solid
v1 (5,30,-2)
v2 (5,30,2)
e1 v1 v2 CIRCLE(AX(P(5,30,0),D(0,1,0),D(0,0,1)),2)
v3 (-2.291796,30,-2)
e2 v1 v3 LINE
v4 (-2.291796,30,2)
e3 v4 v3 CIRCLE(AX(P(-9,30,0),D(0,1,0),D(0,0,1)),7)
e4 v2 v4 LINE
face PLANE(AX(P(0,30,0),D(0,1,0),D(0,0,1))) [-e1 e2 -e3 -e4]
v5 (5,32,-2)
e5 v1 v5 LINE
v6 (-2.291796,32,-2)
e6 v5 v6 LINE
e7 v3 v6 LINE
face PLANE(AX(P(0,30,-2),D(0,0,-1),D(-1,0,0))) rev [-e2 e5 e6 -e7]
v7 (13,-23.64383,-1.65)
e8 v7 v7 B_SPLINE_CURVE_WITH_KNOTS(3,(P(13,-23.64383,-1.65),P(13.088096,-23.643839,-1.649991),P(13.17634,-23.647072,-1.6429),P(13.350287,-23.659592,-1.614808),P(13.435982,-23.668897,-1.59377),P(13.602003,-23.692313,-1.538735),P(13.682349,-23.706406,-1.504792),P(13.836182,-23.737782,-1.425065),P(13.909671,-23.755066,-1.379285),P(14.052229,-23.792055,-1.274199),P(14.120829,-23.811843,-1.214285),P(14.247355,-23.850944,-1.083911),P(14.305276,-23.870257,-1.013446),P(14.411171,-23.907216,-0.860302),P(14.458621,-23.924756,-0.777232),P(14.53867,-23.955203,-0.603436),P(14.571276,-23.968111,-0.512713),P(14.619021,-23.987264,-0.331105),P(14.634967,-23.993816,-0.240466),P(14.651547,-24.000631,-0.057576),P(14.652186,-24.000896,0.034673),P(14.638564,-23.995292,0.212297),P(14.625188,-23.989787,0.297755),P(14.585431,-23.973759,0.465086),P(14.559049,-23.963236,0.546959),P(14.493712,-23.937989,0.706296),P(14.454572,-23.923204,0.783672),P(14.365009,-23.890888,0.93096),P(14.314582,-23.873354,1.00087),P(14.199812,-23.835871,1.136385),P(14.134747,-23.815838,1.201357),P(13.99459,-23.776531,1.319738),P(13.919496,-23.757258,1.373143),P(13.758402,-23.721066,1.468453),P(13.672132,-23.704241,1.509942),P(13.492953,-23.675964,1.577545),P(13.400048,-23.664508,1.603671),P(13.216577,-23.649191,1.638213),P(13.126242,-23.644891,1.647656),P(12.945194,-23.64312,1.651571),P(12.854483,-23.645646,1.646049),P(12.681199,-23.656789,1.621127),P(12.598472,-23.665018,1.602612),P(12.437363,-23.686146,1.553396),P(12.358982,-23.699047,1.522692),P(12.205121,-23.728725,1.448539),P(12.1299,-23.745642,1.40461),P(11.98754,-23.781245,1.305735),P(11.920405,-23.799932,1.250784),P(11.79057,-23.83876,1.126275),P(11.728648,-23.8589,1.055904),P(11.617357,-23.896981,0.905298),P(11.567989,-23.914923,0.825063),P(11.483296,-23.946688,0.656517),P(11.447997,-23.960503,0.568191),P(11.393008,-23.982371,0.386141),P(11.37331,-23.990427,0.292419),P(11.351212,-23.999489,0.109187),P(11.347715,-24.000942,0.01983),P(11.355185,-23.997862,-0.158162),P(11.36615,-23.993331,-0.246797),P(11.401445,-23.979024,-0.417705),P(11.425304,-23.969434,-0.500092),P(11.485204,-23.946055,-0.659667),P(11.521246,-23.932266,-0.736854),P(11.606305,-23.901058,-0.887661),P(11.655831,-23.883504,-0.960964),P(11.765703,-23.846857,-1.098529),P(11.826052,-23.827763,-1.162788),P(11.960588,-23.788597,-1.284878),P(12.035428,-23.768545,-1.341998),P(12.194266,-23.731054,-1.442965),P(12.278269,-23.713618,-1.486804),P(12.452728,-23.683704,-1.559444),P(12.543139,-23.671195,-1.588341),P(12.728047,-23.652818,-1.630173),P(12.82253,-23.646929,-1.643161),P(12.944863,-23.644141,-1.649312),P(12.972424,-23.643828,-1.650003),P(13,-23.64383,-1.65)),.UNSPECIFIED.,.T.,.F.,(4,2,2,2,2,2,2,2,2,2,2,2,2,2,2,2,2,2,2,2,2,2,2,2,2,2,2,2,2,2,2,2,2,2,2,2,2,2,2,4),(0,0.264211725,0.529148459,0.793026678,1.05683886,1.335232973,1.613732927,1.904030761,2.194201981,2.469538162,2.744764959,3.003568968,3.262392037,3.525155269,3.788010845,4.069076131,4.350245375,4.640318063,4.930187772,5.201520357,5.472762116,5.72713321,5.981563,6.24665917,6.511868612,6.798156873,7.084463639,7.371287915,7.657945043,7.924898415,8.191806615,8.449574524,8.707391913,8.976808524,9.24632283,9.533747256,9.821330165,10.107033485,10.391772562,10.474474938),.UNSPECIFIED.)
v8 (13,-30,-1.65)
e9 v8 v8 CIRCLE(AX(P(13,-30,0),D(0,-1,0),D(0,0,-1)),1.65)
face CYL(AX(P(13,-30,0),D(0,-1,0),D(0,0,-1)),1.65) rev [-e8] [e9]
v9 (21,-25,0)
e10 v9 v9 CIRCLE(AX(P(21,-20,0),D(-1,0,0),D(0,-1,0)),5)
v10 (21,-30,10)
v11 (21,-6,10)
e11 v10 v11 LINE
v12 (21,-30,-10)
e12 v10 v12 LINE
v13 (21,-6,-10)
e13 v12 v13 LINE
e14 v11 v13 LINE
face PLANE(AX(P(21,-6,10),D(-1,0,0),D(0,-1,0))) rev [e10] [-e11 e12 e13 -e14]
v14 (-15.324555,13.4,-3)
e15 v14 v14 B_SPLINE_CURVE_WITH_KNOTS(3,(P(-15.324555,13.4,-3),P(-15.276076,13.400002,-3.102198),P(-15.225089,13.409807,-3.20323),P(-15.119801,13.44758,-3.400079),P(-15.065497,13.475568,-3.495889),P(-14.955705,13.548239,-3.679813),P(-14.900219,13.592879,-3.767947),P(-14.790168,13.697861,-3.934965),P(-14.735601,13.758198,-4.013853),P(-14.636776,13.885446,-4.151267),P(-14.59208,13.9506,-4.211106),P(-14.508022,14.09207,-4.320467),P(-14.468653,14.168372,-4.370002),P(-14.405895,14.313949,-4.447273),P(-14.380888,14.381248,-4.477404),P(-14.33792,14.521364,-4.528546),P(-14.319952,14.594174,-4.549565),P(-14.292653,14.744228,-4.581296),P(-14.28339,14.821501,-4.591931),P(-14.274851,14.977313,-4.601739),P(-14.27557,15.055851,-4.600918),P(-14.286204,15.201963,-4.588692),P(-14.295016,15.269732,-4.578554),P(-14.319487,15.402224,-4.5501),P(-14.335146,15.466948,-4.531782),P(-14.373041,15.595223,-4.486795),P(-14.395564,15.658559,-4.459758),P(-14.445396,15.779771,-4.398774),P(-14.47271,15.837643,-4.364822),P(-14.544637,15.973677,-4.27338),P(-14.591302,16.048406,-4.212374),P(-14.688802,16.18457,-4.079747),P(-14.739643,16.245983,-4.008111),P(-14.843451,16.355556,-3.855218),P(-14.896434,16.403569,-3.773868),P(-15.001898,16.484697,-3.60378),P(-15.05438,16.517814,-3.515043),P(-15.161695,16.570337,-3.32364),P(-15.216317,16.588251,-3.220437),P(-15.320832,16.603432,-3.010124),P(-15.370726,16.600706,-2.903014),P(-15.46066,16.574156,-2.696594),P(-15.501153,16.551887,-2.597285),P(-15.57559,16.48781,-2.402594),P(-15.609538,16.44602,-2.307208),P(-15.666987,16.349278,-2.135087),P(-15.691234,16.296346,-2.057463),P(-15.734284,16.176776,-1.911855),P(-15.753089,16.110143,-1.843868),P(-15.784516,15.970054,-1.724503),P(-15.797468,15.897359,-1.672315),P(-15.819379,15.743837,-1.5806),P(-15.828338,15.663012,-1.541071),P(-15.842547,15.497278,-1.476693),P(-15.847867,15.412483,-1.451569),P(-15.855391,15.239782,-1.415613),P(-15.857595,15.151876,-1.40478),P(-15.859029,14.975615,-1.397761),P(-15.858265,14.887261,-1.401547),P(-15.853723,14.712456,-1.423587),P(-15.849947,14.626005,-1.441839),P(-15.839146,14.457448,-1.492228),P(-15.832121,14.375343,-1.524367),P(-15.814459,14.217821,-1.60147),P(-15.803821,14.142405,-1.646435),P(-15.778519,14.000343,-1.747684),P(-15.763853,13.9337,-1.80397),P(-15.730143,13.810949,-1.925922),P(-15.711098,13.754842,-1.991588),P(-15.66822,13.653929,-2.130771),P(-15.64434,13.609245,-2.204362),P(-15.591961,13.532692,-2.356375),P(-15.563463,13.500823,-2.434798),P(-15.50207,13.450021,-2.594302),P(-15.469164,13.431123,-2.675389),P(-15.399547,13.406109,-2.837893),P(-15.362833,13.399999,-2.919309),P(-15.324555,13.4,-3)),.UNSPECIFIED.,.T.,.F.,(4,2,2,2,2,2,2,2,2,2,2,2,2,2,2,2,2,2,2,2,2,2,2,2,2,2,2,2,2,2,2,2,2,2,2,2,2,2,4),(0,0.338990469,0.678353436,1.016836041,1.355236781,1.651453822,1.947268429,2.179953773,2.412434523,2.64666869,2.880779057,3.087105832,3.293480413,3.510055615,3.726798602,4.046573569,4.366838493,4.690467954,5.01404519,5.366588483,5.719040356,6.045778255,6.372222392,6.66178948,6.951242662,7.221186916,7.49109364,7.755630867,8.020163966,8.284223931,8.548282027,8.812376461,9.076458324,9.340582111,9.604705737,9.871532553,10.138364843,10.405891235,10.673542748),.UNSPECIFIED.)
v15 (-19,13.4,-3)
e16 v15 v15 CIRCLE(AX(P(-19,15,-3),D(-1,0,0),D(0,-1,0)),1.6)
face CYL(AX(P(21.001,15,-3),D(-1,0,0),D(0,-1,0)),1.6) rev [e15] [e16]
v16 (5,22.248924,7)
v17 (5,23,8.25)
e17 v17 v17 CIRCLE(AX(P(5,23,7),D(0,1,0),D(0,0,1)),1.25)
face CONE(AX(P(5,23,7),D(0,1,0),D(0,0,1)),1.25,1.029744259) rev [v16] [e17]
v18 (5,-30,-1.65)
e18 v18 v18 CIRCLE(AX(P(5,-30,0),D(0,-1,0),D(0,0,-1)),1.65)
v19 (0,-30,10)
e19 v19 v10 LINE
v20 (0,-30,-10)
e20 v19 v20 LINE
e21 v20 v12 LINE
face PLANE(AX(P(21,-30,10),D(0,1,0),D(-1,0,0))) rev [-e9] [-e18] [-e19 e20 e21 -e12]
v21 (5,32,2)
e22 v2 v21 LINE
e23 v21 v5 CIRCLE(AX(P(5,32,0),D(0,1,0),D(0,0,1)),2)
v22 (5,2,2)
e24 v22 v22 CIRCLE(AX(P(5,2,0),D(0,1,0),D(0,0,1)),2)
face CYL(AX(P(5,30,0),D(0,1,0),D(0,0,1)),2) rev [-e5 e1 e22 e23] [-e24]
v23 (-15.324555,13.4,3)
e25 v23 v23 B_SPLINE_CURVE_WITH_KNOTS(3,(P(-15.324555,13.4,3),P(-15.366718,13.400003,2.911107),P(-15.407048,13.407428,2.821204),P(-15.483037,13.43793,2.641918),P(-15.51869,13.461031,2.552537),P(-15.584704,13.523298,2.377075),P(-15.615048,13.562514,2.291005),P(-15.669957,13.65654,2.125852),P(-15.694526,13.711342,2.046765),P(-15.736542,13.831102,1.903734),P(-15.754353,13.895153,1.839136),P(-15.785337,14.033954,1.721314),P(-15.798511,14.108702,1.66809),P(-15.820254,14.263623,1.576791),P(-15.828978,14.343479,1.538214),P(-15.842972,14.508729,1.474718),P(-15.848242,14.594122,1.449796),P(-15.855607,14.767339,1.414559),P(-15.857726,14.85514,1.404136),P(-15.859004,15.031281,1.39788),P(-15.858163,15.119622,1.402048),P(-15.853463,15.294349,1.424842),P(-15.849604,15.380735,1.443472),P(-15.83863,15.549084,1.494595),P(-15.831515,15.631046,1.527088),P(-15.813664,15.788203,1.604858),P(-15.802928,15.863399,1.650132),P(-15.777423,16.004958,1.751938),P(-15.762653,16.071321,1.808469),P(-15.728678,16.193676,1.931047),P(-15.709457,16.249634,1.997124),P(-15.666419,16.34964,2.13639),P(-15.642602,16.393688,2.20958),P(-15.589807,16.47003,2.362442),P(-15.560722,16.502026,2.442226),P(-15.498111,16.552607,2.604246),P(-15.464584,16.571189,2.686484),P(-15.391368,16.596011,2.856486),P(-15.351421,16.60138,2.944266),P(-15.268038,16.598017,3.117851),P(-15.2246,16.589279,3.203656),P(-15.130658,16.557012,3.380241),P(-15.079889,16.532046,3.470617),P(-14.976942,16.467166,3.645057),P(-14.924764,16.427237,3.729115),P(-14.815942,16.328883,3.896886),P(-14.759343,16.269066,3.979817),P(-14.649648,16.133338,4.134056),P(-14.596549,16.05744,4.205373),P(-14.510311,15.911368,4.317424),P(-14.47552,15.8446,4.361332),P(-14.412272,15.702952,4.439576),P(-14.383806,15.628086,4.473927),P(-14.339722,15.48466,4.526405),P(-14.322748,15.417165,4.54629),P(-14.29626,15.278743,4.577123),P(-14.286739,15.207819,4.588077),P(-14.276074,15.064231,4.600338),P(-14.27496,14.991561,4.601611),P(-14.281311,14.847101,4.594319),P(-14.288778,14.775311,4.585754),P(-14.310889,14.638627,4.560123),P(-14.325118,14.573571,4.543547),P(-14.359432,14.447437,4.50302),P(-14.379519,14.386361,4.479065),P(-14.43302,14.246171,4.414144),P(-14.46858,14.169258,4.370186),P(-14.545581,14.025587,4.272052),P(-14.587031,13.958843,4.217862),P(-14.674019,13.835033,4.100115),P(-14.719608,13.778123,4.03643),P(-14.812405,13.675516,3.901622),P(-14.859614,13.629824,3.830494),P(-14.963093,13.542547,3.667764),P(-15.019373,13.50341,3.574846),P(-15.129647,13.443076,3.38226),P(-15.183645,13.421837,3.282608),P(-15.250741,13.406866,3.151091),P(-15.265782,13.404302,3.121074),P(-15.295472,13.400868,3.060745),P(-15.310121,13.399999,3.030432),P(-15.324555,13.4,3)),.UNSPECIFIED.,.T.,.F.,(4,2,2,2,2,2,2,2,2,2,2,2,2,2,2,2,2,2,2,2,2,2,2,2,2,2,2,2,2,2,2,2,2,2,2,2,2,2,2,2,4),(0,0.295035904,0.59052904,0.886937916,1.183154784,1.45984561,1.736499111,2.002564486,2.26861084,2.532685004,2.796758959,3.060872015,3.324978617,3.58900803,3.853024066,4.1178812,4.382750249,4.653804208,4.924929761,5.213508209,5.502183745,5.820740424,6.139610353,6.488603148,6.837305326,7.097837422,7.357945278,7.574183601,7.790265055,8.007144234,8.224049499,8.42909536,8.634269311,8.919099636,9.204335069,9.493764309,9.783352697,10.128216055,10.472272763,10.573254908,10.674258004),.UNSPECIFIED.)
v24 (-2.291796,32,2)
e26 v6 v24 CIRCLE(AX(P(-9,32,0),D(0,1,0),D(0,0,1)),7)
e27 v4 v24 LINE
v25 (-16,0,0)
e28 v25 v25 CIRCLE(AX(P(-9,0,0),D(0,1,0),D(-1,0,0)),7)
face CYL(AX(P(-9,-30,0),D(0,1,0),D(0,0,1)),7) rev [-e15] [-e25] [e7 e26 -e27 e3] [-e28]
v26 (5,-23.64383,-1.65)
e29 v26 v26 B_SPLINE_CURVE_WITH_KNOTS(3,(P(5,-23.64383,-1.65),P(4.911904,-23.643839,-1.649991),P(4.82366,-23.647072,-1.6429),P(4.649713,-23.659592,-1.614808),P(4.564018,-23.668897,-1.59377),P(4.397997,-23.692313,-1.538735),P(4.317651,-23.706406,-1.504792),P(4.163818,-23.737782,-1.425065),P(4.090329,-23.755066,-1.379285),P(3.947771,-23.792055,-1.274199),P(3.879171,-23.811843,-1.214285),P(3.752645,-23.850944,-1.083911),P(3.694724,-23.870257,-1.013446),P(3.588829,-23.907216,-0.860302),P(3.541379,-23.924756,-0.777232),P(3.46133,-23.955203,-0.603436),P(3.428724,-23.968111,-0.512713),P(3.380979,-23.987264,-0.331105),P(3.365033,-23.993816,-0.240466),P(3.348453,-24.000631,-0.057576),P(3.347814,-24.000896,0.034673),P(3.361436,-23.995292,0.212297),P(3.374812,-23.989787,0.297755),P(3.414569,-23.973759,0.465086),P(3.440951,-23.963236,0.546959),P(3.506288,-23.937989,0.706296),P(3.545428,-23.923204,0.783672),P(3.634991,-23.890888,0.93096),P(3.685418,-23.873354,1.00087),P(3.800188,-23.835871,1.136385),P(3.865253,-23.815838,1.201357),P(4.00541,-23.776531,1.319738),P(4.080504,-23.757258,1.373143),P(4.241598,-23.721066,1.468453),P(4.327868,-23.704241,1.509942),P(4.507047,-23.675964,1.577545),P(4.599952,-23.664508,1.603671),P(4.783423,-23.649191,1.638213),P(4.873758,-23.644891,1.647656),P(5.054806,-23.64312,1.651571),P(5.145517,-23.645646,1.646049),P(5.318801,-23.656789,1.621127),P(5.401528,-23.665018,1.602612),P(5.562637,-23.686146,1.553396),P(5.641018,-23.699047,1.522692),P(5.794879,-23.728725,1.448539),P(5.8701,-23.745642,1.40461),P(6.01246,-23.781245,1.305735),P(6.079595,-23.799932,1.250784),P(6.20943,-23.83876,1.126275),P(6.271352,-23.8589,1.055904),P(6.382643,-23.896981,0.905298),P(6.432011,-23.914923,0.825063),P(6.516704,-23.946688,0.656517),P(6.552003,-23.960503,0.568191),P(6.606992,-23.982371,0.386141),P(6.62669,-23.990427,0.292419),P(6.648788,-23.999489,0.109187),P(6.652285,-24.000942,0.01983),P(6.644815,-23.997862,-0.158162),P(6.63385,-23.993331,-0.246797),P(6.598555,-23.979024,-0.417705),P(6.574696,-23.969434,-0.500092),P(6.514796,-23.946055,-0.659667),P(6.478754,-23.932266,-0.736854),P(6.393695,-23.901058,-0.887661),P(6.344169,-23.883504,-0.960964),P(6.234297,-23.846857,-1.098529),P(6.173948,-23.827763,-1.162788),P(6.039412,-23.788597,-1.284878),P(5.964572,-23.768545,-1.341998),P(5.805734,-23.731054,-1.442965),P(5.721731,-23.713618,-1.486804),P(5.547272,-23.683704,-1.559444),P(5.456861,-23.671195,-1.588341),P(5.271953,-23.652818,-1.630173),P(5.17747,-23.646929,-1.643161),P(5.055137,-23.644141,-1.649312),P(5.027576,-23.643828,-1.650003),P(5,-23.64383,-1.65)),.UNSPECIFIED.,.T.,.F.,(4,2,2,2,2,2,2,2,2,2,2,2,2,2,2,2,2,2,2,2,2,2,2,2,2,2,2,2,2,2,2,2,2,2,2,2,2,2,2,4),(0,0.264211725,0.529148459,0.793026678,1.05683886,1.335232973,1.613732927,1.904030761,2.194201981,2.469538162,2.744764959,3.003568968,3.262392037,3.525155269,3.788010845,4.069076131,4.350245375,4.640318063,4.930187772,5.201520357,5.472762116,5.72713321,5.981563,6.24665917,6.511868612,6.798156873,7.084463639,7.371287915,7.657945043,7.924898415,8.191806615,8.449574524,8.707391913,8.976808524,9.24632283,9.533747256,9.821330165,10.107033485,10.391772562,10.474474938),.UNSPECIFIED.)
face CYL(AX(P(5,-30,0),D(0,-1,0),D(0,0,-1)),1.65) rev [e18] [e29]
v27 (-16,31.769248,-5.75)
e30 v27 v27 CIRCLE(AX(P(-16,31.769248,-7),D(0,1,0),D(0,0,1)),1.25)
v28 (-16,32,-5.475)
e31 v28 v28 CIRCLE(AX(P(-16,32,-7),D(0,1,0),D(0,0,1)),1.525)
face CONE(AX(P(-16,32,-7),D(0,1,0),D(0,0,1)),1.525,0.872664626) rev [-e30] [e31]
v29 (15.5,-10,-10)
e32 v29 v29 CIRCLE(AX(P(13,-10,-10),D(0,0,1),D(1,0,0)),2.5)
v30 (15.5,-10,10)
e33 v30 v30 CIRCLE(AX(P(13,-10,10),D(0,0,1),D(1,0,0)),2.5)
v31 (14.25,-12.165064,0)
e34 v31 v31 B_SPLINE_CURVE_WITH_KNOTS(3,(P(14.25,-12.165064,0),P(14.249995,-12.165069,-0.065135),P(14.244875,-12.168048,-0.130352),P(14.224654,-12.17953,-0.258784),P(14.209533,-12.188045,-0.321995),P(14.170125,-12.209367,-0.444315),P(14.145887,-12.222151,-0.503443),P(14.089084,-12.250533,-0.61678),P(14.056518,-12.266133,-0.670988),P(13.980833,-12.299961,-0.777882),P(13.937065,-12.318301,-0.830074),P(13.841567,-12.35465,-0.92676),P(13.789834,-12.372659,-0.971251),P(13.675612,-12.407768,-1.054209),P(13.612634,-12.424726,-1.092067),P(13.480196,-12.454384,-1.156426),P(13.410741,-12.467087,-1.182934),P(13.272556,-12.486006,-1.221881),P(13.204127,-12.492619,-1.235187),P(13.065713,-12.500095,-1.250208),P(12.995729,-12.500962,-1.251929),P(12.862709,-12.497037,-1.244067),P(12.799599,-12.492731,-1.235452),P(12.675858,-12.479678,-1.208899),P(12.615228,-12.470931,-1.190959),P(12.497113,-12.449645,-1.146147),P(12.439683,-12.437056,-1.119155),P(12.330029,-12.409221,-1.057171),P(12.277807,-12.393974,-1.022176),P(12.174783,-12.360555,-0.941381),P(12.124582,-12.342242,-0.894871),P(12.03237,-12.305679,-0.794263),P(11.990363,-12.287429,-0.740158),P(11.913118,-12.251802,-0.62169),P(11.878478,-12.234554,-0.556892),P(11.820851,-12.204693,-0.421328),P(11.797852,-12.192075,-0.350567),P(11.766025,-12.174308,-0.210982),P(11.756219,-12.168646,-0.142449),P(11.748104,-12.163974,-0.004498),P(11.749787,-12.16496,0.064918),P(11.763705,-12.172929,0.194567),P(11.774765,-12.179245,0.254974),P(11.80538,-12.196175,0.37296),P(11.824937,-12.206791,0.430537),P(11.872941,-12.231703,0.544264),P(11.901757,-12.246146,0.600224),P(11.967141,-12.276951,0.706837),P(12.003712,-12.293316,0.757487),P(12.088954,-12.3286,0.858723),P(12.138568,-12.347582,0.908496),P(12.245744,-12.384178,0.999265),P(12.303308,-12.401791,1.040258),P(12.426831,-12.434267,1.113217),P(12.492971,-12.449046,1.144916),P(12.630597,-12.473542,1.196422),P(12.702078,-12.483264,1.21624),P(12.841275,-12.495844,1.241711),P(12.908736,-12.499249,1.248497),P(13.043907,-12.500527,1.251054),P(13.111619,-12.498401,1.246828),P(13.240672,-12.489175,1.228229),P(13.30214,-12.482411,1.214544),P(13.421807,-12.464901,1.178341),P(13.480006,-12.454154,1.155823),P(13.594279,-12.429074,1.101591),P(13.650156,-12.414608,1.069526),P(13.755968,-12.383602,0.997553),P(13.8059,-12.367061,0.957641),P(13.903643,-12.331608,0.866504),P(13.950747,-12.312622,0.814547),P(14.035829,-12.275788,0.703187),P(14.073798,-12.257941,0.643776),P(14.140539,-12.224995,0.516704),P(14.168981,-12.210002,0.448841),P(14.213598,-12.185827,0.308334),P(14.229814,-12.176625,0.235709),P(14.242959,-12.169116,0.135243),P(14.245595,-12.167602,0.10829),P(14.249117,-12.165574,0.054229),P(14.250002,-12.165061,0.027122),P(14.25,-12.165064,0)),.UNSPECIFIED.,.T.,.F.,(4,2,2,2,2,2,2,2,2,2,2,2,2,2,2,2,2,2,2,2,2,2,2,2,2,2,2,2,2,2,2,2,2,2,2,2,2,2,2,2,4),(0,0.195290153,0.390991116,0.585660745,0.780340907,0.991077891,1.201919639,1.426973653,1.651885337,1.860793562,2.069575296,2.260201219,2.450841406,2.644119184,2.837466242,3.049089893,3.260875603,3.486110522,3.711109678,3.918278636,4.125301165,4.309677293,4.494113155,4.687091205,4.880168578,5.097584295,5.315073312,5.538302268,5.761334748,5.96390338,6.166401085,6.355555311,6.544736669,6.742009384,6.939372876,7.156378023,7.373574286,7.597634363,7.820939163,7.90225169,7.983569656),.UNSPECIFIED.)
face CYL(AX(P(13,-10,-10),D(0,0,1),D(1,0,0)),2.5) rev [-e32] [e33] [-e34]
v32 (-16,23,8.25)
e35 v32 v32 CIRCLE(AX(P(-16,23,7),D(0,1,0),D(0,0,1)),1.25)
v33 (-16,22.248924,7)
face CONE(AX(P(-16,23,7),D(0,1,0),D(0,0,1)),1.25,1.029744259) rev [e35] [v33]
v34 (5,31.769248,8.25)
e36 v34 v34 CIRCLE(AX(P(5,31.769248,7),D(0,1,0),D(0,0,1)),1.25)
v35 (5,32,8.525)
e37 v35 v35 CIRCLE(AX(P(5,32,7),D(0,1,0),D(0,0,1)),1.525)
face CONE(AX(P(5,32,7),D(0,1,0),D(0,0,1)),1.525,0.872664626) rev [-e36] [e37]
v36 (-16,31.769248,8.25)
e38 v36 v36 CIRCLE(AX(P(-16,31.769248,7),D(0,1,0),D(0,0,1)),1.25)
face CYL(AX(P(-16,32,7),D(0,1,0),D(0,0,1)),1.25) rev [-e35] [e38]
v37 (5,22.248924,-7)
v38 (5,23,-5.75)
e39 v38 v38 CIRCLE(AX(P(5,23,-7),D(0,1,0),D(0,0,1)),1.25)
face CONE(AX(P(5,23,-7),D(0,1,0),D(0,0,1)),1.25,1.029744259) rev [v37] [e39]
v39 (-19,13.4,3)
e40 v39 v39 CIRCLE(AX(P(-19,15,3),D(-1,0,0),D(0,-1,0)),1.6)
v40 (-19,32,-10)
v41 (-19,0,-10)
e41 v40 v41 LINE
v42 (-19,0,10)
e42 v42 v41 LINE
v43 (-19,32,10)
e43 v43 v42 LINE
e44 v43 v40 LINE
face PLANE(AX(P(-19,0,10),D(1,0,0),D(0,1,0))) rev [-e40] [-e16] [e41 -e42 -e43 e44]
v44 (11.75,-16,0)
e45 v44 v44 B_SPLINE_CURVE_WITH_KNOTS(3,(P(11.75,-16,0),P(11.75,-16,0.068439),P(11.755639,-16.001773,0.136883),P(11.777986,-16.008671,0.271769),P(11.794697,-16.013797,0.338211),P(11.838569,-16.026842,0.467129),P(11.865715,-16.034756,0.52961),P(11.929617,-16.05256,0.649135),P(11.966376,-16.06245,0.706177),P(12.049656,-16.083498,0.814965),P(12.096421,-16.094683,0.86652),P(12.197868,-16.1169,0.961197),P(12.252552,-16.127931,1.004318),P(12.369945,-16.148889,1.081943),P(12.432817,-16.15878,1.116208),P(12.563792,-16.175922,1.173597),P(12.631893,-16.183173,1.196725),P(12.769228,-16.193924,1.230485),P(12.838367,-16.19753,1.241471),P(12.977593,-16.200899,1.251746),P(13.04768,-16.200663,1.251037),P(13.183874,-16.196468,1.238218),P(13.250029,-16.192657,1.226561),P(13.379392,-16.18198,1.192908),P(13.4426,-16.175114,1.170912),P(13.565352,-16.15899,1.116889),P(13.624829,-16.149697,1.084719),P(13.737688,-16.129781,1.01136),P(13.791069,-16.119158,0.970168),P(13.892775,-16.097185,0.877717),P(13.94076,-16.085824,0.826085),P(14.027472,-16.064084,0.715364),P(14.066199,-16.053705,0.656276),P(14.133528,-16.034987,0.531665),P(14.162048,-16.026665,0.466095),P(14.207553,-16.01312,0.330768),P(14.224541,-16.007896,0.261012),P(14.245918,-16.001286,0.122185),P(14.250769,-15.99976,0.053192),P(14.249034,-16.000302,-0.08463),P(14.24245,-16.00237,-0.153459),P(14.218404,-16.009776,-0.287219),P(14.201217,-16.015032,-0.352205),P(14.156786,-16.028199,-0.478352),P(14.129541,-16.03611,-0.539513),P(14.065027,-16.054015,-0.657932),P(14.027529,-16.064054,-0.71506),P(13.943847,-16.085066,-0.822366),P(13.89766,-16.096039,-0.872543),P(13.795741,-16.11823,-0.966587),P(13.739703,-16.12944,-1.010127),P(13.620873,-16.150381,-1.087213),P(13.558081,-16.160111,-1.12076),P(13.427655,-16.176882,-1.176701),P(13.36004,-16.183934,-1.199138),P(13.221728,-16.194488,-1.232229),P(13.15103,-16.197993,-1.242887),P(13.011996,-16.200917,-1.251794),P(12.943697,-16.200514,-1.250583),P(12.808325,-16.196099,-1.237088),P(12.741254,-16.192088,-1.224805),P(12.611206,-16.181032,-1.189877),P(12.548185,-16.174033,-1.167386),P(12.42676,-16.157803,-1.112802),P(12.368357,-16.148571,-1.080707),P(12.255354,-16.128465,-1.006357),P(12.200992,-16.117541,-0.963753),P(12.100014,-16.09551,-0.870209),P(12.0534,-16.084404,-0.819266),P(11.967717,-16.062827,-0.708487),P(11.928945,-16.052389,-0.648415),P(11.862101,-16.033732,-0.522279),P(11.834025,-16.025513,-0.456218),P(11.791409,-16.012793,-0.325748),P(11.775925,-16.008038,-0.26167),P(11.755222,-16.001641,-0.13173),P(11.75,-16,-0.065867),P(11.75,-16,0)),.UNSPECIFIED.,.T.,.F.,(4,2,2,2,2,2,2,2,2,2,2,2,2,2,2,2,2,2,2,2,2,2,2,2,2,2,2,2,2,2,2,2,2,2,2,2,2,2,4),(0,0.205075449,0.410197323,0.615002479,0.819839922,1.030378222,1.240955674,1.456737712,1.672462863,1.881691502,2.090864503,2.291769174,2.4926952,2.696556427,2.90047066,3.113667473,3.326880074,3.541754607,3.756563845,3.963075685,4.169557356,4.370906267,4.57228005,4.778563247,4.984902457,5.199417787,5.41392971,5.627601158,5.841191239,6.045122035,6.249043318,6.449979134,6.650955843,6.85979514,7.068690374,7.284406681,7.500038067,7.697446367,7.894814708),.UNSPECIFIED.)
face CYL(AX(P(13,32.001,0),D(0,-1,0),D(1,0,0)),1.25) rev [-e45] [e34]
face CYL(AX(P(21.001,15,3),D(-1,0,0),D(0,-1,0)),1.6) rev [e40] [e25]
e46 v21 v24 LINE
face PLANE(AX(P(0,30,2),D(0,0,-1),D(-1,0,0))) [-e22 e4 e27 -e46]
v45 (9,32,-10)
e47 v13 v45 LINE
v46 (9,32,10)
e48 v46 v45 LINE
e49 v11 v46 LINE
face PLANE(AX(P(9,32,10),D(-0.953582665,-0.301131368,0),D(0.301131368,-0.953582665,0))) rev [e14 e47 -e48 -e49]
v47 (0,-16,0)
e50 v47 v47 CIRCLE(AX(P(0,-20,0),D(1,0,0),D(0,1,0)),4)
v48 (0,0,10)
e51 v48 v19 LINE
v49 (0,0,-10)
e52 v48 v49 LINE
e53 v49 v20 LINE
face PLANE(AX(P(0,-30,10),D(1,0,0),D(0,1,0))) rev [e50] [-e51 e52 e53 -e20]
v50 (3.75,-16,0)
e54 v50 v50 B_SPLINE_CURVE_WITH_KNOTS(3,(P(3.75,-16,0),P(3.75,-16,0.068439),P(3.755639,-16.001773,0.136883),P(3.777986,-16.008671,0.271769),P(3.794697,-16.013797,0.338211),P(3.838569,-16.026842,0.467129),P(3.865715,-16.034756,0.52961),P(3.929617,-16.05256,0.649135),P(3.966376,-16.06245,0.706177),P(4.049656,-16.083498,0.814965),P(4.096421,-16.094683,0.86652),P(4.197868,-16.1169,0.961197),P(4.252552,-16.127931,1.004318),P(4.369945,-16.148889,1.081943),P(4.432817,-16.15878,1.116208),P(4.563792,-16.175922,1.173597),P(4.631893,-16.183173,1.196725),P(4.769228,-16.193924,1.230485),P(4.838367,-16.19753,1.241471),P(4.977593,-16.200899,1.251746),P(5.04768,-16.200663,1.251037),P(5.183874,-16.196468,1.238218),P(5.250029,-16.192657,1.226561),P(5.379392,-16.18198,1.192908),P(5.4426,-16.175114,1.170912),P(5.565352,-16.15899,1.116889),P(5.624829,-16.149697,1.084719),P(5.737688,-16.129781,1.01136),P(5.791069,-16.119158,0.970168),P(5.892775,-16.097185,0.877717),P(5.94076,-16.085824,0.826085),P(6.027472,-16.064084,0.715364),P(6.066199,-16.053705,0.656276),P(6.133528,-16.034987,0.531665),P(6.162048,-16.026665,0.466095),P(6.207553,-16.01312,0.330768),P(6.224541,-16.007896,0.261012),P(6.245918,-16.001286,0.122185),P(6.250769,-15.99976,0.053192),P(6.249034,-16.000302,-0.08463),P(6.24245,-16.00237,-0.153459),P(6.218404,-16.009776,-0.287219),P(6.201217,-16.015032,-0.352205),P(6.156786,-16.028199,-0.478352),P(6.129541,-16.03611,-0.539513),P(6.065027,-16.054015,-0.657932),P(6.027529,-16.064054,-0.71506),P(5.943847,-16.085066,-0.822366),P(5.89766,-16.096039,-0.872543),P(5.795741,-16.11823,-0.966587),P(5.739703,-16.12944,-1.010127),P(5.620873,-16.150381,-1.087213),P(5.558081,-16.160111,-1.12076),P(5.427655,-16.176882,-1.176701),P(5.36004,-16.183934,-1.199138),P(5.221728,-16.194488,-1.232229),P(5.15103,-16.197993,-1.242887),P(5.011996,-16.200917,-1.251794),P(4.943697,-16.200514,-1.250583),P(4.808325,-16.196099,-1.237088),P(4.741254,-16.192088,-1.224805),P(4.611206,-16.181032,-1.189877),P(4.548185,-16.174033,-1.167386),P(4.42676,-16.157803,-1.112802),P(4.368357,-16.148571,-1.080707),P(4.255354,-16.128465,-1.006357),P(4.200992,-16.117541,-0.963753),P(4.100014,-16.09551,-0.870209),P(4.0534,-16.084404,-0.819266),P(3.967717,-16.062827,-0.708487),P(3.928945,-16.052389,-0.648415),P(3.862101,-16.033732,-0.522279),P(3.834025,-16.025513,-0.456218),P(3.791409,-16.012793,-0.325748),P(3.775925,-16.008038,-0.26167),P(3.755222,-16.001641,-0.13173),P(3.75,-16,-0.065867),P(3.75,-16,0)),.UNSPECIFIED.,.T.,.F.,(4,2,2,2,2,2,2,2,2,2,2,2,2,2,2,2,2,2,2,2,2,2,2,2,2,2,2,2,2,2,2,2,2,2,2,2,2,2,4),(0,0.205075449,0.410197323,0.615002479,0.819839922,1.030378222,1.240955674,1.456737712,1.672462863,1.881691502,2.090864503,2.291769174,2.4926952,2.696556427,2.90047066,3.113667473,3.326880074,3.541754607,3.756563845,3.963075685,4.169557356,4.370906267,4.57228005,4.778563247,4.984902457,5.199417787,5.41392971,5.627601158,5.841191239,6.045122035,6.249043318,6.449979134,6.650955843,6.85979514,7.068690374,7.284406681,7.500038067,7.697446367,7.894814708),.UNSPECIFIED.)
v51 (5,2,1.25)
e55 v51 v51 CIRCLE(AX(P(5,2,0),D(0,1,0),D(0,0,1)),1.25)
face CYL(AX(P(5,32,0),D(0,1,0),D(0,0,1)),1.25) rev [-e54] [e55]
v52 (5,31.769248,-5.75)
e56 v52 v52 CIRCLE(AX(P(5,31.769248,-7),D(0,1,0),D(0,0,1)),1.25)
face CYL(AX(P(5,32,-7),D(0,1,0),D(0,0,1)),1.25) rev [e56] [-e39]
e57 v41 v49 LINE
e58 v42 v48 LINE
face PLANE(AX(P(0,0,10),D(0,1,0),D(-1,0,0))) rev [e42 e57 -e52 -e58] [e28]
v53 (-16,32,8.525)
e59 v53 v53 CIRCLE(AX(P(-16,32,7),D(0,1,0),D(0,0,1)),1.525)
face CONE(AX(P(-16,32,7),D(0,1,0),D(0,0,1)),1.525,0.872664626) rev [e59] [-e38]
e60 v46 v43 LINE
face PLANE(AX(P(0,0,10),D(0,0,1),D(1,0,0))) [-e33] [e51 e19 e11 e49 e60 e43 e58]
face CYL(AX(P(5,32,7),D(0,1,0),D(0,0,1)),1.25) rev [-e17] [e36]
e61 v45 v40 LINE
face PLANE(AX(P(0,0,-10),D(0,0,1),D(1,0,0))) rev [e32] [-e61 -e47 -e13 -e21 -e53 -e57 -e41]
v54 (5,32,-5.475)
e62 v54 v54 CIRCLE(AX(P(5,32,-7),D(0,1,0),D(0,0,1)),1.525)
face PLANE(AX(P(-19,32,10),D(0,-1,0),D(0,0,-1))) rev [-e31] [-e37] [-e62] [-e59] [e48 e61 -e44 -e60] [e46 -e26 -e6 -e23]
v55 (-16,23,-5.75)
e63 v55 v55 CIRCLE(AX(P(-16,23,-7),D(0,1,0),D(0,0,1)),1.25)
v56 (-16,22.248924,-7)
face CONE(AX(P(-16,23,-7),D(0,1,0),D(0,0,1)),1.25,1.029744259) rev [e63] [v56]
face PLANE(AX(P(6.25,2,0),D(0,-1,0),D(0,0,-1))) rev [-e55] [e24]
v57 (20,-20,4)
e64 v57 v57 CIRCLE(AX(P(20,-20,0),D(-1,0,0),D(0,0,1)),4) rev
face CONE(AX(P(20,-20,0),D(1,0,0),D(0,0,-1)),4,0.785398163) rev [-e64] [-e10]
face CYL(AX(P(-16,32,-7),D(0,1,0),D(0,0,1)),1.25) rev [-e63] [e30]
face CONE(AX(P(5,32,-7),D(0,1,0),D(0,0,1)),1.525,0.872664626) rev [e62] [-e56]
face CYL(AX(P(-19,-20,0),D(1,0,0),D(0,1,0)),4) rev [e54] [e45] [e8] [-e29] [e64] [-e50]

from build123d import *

# Parameters (mm, degrees)
BOSS_EXTRUDE1_DEPTH         = 10
CUT_EXTRUDE1_DEPTH          = 67.219332525
CUT_EXTRUDE2_DEPTH          = 2
M3_TAPPED_HOLE2_D           = 2.5
M3_TAPPED_HOLE2_DEPTH       = 9
M3_TAPPED_HOLE2_CSINK_D     = 3.05
M3_TAPPED_HOLE2_CSINK_ANGLE = 100
M3_TAPPED_HOLE2_TIP         = 0.751075774
SKETCH7_R                   = 2.5
CUT_EXTRUDE3_DEPTH          = 44.185645763
SKETCH8_R                   = 4
CUT_EXTRUDE4_DEPTH          = 53.191953403
CHAMFER1_SIZE               = 1
CUT_EXTRUDE5_REACH          = 54.192
CUT_EXTRUDE5_END_RADIUS     = 7
SKETCH11_R                  = 1.6
M4_TAPPED_HOLE1_REACH       = 68.219
M4_TAPPED_HOLE1_BORE_R      = 1.65
CUT_EXTRUDE6_REACH          = 68.219
CUT_EXTRUDE6_END_RADIUS     = 2.5
SKETCH14_R                  = 1.25


# Read off the part's stored shape, not the designer's step: Hole1
with BuildPart() as part:
    # Sketch1 → Boss-Extrude1 (new, symmetric)
    with BuildSketch(Plane.XY):
        Polygon((0, 0), (-19, 0), (-19, 32), (9, 32), (21, -6), (21, -30), (0, -30), align=None)
    extrude(amount=BOSS_EXTRUDE1_DEPTH, both=True)

    # Sketch2 → Cut-Extrude1 (cut, through all)
    with BuildSketch(Plane(origin=(0, 32, 0), x_dir=(1, 0, 0), z_dir=(0, 1, 0))):
        with BuildLine():
            ThreePointArc((-2.291796068, 2), (-10.010587075, 6.926666858), (-16, 0))
            Line((-16, 0), (-2, 0))
            ThreePointArc((-2, 0), (-2.073333142, 1.010587075), (-2.291796068, 2))
        make_face()
        with BuildLine():
            Line((-2, 0), (-16, 0))
            ThreePointArc((-16, 0), (-10.010587075, -6.926666858), (-2.291796068, -2))
            ThreePointArc((-2.291796068, -2), (-2.073333142, -1.010587075), (-2, 0))
        make_face()
    extrude(amount=-CUT_EXTRUDE1_DEPTH, mode=Mode.SUBTRACT)

    # Sketch2<3> → Cut-Extrude2 (cut)
    with BuildSketch(Plane(origin=(0, 32, 0), x_dir=(1, 0, 0), z_dir=(0, 1, 0))):
        with BuildLine():
            ThreePointArc((5, 2), (3.585786438, 1.414213562), (3, 0))
            Line((3, 0), (7, 0))
            ThreePointArc((7, 0), (6.414213562, 1.414213562), (5, 2))
        make_face()
        with BuildLine():
            Line((7, 0), (3, 0))
            ThreePointArc((3, 0), (3.585786438, -1.414213562), (5, -2))
            ThreePointArc((5, -2), (6.414213562, -1.414213562), (7, 0))
        make_face()
        with BuildLine():
            ThreePointArc((-2.291796068, 2), (-2.073333142, 1.010587075), (-2, 0))
            Line((-2, 0), (3, 0))
            ThreePointArc((3, 0), (3.585786438, 1.414213562), (5, 2))
            Line((5, 2), (-2.291796068, 2))
        make_face()
        with BuildLine():
            Line((3, 0), (-2, 0))
            ThreePointArc((-2, 0), (-2.073333142, -1.010587075), (-2.291796068, -2))
            Line((-2.291796068, -2), (5, -2))
            ThreePointArc((5, -2), (3.585786438, -1.414213562), (3, 0))
        make_face()
    extrude(amount=-CUT_EXTRUDE2_DEPTH, mode=Mode.SUBTRACT)

    # M3 Tapped Hole2
    with Locations(Plane(origin=(0, 32, 0), x_dir=(1, 0, 0), z_dir=(0, 1, 0))):
        with Locations((-16, 7), (-16, -7), (5, 7), (5, -7)):
            CounterSinkHole(M3_TAPPED_HOLE2_D / 2, M3_TAPPED_HOLE2_CSINK_D / 2, depth=M3_TAPPED_HOLE2_DEPTH, counter_sink_angle=M3_TAPPED_HOLE2_CSINK_ANGLE)
            with Locations((0, 0, -(M3_TAPPED_HOLE2_DEPTH + M3_TAPPED_HOLE2_TIP / 2))):  # 118° drill point
                Cone(0, M3_TAPPED_HOLE2_D / 2, M3_TAPPED_HOLE2_TIP, mode=Mode.SUBTRACT)

    # Sketch7 → Cut-Extrude3 (cut, through all)
    with BuildSketch(Plane.XY.offset(10)):
        with Locations((13, -10)):
            Circle(SKETCH7_R)
    extrude(amount=-CUT_EXTRUDE3_DEPTH, mode=Mode.SUBTRACT)

    # Sketch8 → Cut-Extrude4 (cut, through all)
    with BuildSketch(Plane(origin=(21, 0, 0), x_dir=(0, 0, -1), z_dir=(1, 0, 0))):
        with Locations(Location((0, -20, 0), (0, 0, 90))):
            Circle(SKETCH8_R)
    extrude(amount=-CUT_EXTRUDE4_DEPTH, mode=Mode.SUBTRACT)

    # Chamfer1
    chamfer1_edges = [part.edges().sort_by_distance(p)[0] for p in [
        (21, -24, 0),
    ]]
    chamfer(chamfer1_edges, length=CHAMFER1_SIZE)

    # Hole1 outline → Hole1 (revolve, cut)
    with BuildSketch(Plane(origin=(5, 0, 0), x_dir=(1, 0, 0), z_dir=(0, 0, 1))):
        Polygon((1.25, 2), (2, 2), (2, 32), (0, 32), (0, -16.200413917), (1.25, -16.200413917), align=None)
    revolve(axis=Axis((5, 0, 0), (0, 1, 0)), mode=Mode.SUBTRACT)

    # Cut-Extrude5: up to this cylinder (the profile starts outside it)
    cut_extrude5_end = Plane(origin=(-9, 15, 0), z_dir=(0, 1, 0)) * Cylinder(CUT_EXTRUDE5_END_RADIUS, 123.384, mode=Mode.PRIVATE)
    # Sketch11 → Cut-Extrude5 (cut, up to the surface)
    with BuildSketch(Plane.ZY.offset(19), mode=Mode.PRIVATE) as cut_extrude5_sk1:
        with Locations(Location((-3, 15, 0), (0, 0, 270))):
            Circle(SKETCH11_R)
    cut_extrude5_tool1 = extrude(cut_extrude5_sk1.sketch, amount=-CUT_EXTRUDE5_REACH, mode=Mode.PRIVATE) - cut_extrude5_end
    add(cut_extrude5_tool1.solids().sort_by_distance((-19, 15, -3))[0], mode=Mode.SUBTRACT)
    # Sketch11 → Cut-Extrude5 (cut, up to the surface)
    with BuildSketch(Plane.ZY.offset(19), mode=Mode.PRIVATE) as cut_extrude5_sk2:
        with Locations(Location((3, 15, 0), (0, 0, 270))):
            Circle(SKETCH11_R)
    cut_extrude5_tool2 = extrude(cut_extrude5_sk2.sketch, amount=-CUT_EXTRUDE5_REACH, mode=Mode.PRIVATE) - cut_extrude5_end
    add(cut_extrude5_tool2.solids().sort_by_distance((-19, 15, 3))[0], mode=Mode.SUBTRACT)

    # M4 Tapped Hole1 bore → M4 Tapped Hole1 (cut, up to next)
    with BuildSketch(Plane(origin=(0, -30, 0), x_dir=(-1, 0, 0), z_dir=(0, -1, 0)), mode=Mode.PRIVATE) as m4_tapped_hole1_sk1:
        with Locations((-13, 0)):
            Circle(M4_TAPPED_HOLE1_BORE_R)
    m4_tapped_hole1_tool1 = extrude(m4_tapped_hole1_sk1.sketch, amount=-M4_TAPPED_HOLE1_REACH, mode=Mode.PRIVATE) & part.part
    # M4 Tapped Hole1 bore → M4 Tapped Hole1 (cut, up to next)
    with BuildSketch(Plane(origin=(0, -30, 0), x_dir=(-1, 0, 0), z_dir=(0, -1, 0)), mode=Mode.PRIVATE) as m4_tapped_hole1_sk2:
        with Locations((-5, 0)):
            Circle(M4_TAPPED_HOLE1_BORE_R)
    m4_tapped_hole1_tool2 = extrude(m4_tapped_hole1_sk2.sketch, amount=-M4_TAPPED_HOLE1_REACH, mode=Mode.PRIVATE) & part.part
    add(m4_tapped_hole1_tool1.solids().sort_by_distance((13, -30, 0))[0], mode=Mode.SUBTRACT)
    add(m4_tapped_hole1_tool2.solids().sort_by_distance((5, -30, 0))[0], mode=Mode.SUBTRACT)

    # Cut-Extrude6: up to this cylinder (the profile starts outside it)
    cut_extrude6_end = Plane(origin=(13, -10, 0), z_dir=(0, 0, 1)) * Cylinder(CUT_EXTRUDE6_END_RADIUS, 142.438, mode=Mode.PRIVATE)
    # Sketch14 → Cut-Extrude6 (cut, up to the surface)
    with BuildSketch(Plane.XZ.offset(30), mode=Mode.PRIVATE) as cut_extrude6_sk1:
        with Locations((13, 0)):
            Circle(SKETCH14_R)
    cut_extrude6_tool1 = extrude(cut_extrude6_sk1.sketch, amount=-CUT_EXTRUDE6_REACH, mode=Mode.PRIVATE) - cut_extrude6_end
    add(cut_extrude6_tool1.solids().sort_by_distance((13, -30, 0))[0], mode=Mode.SUBTRACT)


solid = part.part
